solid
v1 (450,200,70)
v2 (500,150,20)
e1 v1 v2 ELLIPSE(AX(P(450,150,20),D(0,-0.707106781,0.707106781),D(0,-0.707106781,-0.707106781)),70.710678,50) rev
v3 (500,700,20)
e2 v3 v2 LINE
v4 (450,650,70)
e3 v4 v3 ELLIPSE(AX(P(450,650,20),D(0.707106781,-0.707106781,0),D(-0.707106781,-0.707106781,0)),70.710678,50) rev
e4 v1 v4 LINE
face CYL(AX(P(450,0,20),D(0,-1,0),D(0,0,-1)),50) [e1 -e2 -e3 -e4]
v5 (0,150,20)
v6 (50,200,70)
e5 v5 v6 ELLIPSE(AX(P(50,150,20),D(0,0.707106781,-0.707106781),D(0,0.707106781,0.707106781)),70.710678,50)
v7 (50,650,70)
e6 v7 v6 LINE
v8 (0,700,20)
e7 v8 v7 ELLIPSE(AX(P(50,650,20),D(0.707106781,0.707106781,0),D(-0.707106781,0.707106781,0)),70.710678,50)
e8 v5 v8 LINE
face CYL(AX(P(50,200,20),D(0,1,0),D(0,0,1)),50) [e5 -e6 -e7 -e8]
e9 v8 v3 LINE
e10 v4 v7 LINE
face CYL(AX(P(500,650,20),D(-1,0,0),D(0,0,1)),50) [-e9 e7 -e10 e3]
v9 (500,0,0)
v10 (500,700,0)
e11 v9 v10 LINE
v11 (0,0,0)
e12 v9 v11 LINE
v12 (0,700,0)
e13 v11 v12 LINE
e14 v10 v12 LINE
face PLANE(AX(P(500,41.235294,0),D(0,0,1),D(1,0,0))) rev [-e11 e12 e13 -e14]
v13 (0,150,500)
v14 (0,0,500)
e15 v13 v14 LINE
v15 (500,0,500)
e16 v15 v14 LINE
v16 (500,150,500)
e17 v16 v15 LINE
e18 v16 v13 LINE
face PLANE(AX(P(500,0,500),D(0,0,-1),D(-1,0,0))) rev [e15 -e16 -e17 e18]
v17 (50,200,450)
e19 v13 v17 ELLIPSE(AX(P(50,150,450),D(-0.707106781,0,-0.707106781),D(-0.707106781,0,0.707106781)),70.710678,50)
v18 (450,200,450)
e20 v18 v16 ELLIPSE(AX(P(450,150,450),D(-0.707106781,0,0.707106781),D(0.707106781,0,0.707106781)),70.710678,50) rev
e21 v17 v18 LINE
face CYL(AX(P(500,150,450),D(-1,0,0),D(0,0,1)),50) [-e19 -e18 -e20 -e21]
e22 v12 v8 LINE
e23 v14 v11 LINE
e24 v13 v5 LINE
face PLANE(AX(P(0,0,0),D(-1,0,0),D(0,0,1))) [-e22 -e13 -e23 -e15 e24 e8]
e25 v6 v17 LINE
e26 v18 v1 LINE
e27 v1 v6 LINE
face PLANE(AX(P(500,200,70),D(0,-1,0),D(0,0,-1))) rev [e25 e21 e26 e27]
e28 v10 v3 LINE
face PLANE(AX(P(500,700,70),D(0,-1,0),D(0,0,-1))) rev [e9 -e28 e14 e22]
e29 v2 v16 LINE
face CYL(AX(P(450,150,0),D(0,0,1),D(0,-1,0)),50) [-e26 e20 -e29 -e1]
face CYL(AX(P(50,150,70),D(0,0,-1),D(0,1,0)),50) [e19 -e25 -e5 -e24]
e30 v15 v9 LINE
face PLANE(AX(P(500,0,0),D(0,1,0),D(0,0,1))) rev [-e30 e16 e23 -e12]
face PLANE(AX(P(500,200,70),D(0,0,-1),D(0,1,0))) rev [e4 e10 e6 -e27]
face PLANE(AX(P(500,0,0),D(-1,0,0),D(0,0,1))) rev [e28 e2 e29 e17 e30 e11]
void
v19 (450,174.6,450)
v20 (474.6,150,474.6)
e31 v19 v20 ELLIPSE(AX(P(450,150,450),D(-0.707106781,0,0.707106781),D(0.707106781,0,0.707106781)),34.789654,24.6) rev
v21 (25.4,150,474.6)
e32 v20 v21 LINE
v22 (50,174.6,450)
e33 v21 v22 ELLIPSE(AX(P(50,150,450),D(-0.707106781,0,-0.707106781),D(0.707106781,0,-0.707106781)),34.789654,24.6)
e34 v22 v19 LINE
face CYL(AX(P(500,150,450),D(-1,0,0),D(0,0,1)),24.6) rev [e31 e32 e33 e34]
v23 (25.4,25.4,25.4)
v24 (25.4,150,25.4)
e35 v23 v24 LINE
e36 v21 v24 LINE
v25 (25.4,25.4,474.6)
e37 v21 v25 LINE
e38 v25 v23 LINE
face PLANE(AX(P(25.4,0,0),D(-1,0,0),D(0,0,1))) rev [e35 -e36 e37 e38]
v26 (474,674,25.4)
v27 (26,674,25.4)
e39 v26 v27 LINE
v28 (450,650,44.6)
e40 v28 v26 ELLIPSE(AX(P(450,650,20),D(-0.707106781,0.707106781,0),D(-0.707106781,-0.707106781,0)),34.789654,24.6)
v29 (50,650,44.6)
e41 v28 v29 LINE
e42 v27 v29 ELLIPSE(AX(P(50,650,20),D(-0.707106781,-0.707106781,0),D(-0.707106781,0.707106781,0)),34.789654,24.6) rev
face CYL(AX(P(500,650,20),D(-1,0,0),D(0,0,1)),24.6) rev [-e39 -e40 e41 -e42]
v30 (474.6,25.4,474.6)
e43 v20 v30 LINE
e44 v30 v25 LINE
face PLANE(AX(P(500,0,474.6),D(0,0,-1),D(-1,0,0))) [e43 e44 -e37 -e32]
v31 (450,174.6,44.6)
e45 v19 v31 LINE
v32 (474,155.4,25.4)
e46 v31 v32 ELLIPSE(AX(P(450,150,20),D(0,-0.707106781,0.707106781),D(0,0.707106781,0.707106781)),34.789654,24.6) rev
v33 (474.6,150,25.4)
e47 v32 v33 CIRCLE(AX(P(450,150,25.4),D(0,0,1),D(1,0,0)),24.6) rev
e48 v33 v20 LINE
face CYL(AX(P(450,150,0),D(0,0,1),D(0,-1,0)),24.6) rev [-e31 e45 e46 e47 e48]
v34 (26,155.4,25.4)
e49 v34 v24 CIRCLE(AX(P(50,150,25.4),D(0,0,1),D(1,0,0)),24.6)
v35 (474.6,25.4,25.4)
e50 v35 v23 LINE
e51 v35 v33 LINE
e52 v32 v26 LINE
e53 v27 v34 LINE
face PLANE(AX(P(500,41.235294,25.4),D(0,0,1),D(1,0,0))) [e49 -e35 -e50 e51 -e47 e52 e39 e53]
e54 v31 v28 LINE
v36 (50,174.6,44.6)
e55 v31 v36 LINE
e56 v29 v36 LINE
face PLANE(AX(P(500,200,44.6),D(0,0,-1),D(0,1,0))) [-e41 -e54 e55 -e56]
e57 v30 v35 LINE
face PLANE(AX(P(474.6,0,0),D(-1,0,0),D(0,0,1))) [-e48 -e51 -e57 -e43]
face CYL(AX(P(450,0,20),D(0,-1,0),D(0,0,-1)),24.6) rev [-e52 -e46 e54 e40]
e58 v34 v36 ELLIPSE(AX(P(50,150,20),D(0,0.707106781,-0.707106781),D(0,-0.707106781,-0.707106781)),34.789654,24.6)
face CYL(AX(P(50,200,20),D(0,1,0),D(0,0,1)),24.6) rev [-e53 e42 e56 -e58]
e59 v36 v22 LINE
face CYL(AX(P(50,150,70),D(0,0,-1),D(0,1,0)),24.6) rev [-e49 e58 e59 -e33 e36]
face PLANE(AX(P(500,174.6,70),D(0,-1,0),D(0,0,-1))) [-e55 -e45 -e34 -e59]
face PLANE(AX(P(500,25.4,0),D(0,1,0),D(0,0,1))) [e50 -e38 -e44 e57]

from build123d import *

# Parameters (mm, degrees)
BOSS_EXTRUDE1_DEPTH = 500
FILLET1_R           = 50
SHELL1_START        = 25.4
SHELL1_DEPTH        = 449.2
SHELL1_START_2      = 24
SHELL1_2_DEPTH      = 452
SHELL1_START_3      = 154
SHELL1_3_DEPTH      = 20.6
SHELL1_START_4      = 174.6
SHELL1_4_DEPTH      = 500.4


with BuildPart() as part:
    # Sketch1 → Boss-Extrude1 (new body)
    with BuildSketch(Plane(origin=(0, 0, 0), x_dir=(0, 0, -1), z_dir=(1, 0, 0))):
        Polygon((0, 0), (-500, 0), (-500, 200), (-70, 200), (-70, 700), (0, 700), (0, 41.235294118), align=None)
    extrude(amount=BOSS_EXTRUDE1_DEPTH)

    # Fillet1
    fillet1_edges = [part.edges().sort_by_distance(p)[0] for p in [
        (250, 200, 500),
        (250, 700, 70),
        (500, 450, 70),
        (500, 200, 285),
        (0, 200, 285),
        (0, 450, 70),
    ]]
    fillet(fillet1_edges, radius=FILLET1_R)

    # Shell1: read off the stored shape, not the designer's step
    # Shell1 outline → Shell1 (cut)
    with BuildSketch(Plane.YZ.offset(SHELL1_START)):
        with BuildLine():
            Line((25.4, 25.4), (674, 25.4))
            ThreePointArc((674, 25.4), (665.36749817, 39.209372712), (650, 44.6))
            Line((650, 44.6), (174.6, 44.6))
            Line((174.6, 44.6), (174.6, 450))
            ThreePointArc((174.6, 450), (167.394826817, 467.394826817), (150, 474.6))
            Line((150, 474.6), (25.4, 474.6))
            Line((25.4, 474.6), (25.4, 25.4))
        make_face()
    extrude(amount=SHELL1_DEPTH, mode=Mode.SUBTRACT)

    # Shell1 2 outline → Shell1 2 (add)
    with BuildSketch(Plane.XY.offset(SHELL1_START_2)):
        with BuildLine():
            ThreePointArc((25.4, 150), (32.605173183, 167.394826817), (50, 174.6))
            Line((50, 174.6), (25.4, 174.6))
            Line((25.4, 174.6), (25.4, 150))
        make_face()
        with BuildLine():
            ThreePointArc((450, 174.6), (467.394826817, 167.394826817), (474.6, 150))
            Line((474.6, 150), (474.6, 174.6))
            Line((474.6, 174.6), (450, 174.6))
        make_face()
    extrude(amount=SHELL1_2_DEPTH)

    # Shell1 3 outline → Shell1 3 (cut)
    with BuildSketch(Plane(origin=(0, 0, 0), x_dir=(1, 0, 0), z_dir=(0, 1, 0)).offset(SHELL1_START_3)):
        with BuildLine():
            ThreePointArc((450, -44.6), (465.36749817, -39.209372712), (474, -25.4))
            Line((474, -25.4), (26, -25.4))
            ThreePointArc((26, -25.4), (34.63250183, -39.209372712), (50, -44.6))
            Line((50, -44.6), (450, -44.6))
        make_face()
    extrude(amount=SHELL1_3_DEPTH, mode=Mode.SUBTRACT)

    # Shell1 4 outline → Shell1 4 (add)
    with BuildSketch(Plane(origin=(0, 0, 0), x_dir=(1, 0, 0), z_dir=(0, 1, 0)).offset(SHELL1_START_4)):
        with BuildLine():
            Line((474.6, -25.4), (474, -25.4))
            ThreePointArc((474, -25.4), (465.36749817, -39.209372712), (450, -44.6))
            Line((450, -44.6), (474.6, -44.6))
            Line((474.6, -44.6), (474.6, -25.4))
        make_face()
        with BuildLine():
            ThreePointArc((50, -44.6), (34.63250183, -39.209372712), (26, -25.4))
            Line((26, -25.4), (25.4, -25.4))
            Line((25.4, -25.4), (25.4, -44.6))
            Line((25.4, -44.6), (50, -44.6))
        make_face()
    extrude(amount=SHELL1_4_DEPTH)


solid = part.part
